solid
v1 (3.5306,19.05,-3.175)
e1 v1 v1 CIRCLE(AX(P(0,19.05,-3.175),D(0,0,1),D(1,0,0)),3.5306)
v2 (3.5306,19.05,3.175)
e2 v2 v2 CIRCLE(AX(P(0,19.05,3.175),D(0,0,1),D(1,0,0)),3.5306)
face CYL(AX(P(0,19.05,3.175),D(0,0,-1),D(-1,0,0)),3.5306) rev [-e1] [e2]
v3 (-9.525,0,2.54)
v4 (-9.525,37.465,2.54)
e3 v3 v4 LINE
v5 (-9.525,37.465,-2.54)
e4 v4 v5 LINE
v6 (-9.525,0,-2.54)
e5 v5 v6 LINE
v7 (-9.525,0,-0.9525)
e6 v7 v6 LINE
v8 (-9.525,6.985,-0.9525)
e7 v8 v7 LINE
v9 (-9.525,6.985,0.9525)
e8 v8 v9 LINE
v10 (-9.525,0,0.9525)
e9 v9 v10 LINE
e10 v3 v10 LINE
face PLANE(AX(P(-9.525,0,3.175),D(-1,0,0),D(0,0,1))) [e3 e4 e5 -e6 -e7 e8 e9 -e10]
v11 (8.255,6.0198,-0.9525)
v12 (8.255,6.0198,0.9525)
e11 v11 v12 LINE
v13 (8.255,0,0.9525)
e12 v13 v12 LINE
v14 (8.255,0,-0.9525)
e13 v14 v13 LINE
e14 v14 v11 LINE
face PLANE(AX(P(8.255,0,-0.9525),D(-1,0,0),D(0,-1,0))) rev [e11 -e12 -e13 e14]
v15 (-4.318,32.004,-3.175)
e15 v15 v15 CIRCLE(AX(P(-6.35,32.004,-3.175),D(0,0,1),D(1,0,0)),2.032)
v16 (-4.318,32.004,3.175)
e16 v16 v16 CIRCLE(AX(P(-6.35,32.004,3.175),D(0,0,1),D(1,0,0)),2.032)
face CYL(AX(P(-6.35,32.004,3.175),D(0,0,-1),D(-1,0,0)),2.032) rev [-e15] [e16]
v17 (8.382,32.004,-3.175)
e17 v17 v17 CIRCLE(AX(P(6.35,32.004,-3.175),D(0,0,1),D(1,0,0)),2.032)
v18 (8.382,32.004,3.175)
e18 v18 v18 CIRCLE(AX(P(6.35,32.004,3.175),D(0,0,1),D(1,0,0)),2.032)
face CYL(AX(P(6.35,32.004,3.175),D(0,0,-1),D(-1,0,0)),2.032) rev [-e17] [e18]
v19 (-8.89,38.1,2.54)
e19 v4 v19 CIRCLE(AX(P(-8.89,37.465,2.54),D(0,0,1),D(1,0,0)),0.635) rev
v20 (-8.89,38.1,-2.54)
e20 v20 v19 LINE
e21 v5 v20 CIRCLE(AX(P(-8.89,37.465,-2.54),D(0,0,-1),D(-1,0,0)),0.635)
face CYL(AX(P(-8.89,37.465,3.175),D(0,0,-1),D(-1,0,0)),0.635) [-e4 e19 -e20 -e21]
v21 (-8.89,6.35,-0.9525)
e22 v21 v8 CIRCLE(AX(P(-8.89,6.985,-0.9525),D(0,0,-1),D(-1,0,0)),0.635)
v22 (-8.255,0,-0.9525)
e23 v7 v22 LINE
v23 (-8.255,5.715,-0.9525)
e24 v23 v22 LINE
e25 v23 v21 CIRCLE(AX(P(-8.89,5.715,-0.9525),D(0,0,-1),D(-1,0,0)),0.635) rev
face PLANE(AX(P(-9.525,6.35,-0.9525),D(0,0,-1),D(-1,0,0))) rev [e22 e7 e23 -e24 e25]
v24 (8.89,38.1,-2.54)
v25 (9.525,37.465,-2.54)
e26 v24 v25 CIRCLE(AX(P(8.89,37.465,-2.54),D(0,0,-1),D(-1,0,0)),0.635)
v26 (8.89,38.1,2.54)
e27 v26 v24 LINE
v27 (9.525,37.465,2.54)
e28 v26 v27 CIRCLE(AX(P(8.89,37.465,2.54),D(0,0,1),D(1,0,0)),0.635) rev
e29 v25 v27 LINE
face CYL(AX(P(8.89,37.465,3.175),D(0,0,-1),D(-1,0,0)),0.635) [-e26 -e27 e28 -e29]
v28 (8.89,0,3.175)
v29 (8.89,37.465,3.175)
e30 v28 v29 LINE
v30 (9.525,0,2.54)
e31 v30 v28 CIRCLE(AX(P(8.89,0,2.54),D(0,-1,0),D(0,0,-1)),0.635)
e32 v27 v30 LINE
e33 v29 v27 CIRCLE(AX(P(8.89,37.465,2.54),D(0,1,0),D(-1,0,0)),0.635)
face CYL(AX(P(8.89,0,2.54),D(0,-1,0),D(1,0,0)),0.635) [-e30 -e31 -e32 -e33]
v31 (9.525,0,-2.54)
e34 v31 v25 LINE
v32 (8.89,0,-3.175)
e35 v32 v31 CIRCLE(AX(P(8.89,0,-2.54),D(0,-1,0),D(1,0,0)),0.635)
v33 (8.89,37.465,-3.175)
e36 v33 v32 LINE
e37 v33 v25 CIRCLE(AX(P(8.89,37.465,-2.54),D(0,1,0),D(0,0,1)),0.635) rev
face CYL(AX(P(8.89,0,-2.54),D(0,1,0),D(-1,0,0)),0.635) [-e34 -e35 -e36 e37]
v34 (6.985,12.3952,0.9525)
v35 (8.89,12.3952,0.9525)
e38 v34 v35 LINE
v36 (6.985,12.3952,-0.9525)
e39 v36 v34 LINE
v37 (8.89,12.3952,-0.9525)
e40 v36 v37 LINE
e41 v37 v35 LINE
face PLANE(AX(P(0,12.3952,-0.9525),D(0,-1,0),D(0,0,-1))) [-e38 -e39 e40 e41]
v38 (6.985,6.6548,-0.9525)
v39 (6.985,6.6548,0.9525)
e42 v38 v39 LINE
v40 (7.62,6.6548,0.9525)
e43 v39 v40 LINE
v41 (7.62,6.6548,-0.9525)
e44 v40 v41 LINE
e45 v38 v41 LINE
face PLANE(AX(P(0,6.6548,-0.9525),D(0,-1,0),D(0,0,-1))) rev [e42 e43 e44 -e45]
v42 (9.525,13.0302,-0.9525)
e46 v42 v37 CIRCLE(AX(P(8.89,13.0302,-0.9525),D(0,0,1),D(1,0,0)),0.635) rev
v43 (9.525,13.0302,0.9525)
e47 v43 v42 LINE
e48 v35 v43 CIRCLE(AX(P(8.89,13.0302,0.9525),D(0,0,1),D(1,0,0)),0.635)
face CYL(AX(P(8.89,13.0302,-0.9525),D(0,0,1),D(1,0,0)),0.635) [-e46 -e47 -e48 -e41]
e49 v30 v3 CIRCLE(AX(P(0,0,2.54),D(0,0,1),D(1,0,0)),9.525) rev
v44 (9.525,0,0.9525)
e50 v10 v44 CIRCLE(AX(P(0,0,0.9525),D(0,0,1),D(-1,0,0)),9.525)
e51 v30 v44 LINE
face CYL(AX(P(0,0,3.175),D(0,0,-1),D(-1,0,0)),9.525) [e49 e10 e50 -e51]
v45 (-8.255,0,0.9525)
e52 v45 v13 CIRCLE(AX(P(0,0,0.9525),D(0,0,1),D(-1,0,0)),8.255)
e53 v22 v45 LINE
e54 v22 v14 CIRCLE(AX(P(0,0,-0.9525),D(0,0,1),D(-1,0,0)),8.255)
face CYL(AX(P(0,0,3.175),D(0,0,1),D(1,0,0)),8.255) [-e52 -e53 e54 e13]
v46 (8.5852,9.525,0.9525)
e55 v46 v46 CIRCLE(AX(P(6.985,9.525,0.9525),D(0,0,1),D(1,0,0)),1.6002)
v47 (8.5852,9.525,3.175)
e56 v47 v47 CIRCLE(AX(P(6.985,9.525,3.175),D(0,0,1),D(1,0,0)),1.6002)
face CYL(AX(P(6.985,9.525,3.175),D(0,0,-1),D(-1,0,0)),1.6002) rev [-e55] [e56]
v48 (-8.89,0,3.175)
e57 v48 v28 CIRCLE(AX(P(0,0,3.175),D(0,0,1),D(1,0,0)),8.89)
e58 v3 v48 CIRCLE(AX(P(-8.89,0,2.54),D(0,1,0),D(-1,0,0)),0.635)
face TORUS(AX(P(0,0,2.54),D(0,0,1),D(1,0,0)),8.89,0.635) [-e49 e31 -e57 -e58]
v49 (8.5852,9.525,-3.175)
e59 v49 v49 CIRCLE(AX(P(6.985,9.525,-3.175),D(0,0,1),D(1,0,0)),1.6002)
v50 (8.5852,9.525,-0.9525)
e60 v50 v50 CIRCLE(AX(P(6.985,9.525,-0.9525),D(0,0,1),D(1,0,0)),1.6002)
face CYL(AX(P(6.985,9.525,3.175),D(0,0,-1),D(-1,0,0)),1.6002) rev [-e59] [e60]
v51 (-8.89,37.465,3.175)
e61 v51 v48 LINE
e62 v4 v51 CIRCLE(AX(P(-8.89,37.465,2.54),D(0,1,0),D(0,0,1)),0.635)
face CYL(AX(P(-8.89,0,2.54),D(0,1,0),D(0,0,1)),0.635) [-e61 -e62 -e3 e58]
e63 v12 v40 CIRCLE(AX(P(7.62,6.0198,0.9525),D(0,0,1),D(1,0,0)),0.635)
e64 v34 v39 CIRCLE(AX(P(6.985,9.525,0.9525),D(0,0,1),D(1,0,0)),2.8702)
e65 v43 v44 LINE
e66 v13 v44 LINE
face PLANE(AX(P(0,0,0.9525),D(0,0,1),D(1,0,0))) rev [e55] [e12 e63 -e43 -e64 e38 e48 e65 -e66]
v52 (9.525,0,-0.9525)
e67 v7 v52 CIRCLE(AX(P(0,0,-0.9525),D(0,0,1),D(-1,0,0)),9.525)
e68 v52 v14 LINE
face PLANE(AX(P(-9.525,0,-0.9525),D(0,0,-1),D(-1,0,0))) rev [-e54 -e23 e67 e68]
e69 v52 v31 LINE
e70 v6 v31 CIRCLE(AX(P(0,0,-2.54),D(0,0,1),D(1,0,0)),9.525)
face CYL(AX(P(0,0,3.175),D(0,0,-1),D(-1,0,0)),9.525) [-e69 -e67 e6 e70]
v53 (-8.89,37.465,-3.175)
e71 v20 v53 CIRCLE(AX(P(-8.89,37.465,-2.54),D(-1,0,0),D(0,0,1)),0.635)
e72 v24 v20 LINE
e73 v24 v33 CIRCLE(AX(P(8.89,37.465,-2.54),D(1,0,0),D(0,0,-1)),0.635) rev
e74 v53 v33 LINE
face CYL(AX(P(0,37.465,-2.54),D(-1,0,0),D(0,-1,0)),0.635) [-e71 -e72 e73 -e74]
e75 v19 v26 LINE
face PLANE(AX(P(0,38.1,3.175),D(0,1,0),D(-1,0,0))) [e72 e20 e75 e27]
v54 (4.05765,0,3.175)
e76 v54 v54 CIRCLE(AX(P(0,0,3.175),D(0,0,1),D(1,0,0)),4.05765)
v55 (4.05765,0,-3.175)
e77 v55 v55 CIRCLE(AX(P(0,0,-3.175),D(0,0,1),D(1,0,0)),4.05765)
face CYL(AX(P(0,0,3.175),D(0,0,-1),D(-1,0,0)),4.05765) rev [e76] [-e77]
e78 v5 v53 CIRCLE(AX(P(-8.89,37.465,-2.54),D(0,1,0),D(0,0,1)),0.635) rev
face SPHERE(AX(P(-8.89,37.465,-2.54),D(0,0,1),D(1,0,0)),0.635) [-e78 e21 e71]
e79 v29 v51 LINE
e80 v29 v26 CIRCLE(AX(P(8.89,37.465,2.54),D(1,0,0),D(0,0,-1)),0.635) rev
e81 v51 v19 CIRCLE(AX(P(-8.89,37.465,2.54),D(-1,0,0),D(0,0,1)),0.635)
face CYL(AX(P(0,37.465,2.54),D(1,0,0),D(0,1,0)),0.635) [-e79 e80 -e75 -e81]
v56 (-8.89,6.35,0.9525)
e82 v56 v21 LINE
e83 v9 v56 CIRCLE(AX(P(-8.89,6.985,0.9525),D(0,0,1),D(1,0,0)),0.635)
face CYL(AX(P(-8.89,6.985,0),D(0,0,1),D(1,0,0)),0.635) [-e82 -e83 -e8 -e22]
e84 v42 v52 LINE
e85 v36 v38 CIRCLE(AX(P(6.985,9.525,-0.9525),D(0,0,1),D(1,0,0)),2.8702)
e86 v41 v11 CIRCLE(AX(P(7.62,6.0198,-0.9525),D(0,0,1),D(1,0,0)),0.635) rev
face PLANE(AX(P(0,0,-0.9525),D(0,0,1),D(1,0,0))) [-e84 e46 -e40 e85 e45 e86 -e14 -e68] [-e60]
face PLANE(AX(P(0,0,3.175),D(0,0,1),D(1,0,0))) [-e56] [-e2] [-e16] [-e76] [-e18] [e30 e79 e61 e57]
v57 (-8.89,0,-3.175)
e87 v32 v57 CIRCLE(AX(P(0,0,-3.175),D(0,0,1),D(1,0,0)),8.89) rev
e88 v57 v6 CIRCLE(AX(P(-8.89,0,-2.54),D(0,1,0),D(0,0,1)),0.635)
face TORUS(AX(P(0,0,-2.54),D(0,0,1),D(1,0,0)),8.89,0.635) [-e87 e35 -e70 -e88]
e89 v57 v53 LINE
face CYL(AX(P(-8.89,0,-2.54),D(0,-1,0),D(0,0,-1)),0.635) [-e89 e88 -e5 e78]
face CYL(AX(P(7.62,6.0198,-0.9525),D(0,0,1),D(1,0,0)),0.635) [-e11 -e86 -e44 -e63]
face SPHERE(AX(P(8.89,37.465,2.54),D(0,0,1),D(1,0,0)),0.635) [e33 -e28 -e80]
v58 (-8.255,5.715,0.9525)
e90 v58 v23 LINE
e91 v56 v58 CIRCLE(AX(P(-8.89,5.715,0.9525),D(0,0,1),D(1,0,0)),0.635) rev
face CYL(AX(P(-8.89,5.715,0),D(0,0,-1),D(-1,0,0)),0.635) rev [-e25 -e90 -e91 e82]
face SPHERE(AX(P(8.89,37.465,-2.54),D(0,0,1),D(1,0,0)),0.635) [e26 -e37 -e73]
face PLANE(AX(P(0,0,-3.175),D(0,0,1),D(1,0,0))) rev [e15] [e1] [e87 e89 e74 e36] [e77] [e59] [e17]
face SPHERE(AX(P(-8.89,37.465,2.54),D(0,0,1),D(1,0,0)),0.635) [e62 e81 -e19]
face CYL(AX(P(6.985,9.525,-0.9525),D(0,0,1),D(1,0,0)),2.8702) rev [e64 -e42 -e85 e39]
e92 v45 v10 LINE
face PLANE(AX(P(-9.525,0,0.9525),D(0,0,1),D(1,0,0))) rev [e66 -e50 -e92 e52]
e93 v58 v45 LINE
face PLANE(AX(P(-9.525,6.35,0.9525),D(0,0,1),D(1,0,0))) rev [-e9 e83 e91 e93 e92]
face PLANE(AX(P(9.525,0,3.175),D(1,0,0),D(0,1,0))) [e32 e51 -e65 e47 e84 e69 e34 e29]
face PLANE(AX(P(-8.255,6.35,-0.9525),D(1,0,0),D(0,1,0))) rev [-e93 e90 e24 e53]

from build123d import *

# Parameters (mm, degrees)
SKETCH1_R           = 4.05765
SKETCH1_R_2         = 3.5306
SKETCH1_R_3         = 2.032
SKETCH1_R_4         = 1.6002
BOSS_EXTRUDE1_DEPTH = 3.175
SKETCH1_7_R         = 1.6002
CUT_EXTRUDE4_DEPTH  = 0.9525
SKETCH3_W           = 1.27
SKETCH3_H           = 1.905
FILLET1_R           = 0.635
FILLET2_R           = 0.635


with BuildPart() as part:
    # Sketch1 → Boss-Extrude1 (new, symmetric)
    with BuildSketch(Plane.XY):
        with BuildLine():
            Line((9.525, 38.1), (9.525, 0))
            ThreePointArc((9.525, 0), (0, -9.525), (-9.525, 0))
            Line((-9.525, 0), (-9.525, 38.1))
            Line((-9.525, 38.1), (9.525, 38.1))
        make_face()
        Circle(SKETCH1_R, mode=Mode.SUBTRACT)
        with Locations((0, 19.05)):
            Circle(SKETCH1_R_2, mode=Mode.SUBTRACT)
        with Locations((-6.35, 32.004)):
            Circle(SKETCH1_R_3, mode=Mode.SUBTRACT)
        with Locations((6.35, 32.004)):
            Circle(SKETCH1_R_3, mode=Mode.SUBTRACT)
        with Locations((6.985, 9.525)):
            Circle(SKETCH1_R_4, mode=Mode.SUBTRACT)
    extrude(amount=BOSS_EXTRUDE1_DEPTH, both=True)

    # Sketch1<7> → Cut-Extrude4 (cut, symmetric)
    with BuildSketch(Plane.XY):
        with BuildLine():
            Line((9.525, 6.6548), (9.525, 12.3952))
            Line((9.525, 12.3952), (6.985, 12.3952))
            ThreePointArc((6.985, 12.3952), (4.1148, 9.525), (6.985, 6.6548))
            Line((6.985, 6.6548), (9.525, 6.6548))
        make_face()
        with Locations((6.985, 9.525)):
            Circle(SKETCH1_7_R, mode=Mode.SUBTRACT)
    extrude(amount=CUT_EXTRUDE4_DEPTH, both=True, mode=Mode.SUBTRACT)

    # Cut-Sweep1: sweep along a path in Sketch2
    with BuildLine(Plane.XY.offset(3.175)) as cut_sweep1_path:
        Line((9.525, 6.6548), (9.525, 0))
        ThreePointArc((9.525, 0), (0, -9.525), (-9.525, 0))
        Line((-9.525, 0), (-9.525, 6.35))
    # Sketch3 → Cut-Sweep1 (sweep, cut)
    with BuildSketch(Plane(origin=(0, 6.6548, 0), x_dir=(1, 0, 0), z_dir=(0, 1, 0))):
        with Locations((8.89, 0)):
            Rectangle(SKETCH3_W, SKETCH3_H)
    sweep(path=cut_sweep1_path.line, mode=Mode.SUBTRACT)

    # Fillet1
    fillet1_edges = [part.edges().sort_by_distance(p)[0] for p in [
        (0, -9.525, 3.175),
        (-9.525, 19.05, -3.175),
        (0, 38.1, -3.175),
        (9.525, 19.05, 3.175),
        (9.525, 19.05, -3.175),
        (0, -9.525, -3.175),
        (-9.525, 38.1, 0),
        (9.525, 38.1, 0),
        (0, 38.1, 3.175),
        (-9.525, 19.05, 3.175),
    ]]
    fillet(fillet1_edges, radius=FILLET1_R)

    # Fillet2
    fillet2_edges = [part.edges().sort_by_distance(p)[0] for p in [
        (8.255, 6.6548, 0),
        (9.525, 12.3952, 0),
        (-9.525, 6.35, 0),
        (-8.255, 6.35, 0),
    ]]
    fillet(fillet2_edges, radius=FILLET2_R - 0.0001)  # a hair under: the kernel refuses the full size


solid = part.part
